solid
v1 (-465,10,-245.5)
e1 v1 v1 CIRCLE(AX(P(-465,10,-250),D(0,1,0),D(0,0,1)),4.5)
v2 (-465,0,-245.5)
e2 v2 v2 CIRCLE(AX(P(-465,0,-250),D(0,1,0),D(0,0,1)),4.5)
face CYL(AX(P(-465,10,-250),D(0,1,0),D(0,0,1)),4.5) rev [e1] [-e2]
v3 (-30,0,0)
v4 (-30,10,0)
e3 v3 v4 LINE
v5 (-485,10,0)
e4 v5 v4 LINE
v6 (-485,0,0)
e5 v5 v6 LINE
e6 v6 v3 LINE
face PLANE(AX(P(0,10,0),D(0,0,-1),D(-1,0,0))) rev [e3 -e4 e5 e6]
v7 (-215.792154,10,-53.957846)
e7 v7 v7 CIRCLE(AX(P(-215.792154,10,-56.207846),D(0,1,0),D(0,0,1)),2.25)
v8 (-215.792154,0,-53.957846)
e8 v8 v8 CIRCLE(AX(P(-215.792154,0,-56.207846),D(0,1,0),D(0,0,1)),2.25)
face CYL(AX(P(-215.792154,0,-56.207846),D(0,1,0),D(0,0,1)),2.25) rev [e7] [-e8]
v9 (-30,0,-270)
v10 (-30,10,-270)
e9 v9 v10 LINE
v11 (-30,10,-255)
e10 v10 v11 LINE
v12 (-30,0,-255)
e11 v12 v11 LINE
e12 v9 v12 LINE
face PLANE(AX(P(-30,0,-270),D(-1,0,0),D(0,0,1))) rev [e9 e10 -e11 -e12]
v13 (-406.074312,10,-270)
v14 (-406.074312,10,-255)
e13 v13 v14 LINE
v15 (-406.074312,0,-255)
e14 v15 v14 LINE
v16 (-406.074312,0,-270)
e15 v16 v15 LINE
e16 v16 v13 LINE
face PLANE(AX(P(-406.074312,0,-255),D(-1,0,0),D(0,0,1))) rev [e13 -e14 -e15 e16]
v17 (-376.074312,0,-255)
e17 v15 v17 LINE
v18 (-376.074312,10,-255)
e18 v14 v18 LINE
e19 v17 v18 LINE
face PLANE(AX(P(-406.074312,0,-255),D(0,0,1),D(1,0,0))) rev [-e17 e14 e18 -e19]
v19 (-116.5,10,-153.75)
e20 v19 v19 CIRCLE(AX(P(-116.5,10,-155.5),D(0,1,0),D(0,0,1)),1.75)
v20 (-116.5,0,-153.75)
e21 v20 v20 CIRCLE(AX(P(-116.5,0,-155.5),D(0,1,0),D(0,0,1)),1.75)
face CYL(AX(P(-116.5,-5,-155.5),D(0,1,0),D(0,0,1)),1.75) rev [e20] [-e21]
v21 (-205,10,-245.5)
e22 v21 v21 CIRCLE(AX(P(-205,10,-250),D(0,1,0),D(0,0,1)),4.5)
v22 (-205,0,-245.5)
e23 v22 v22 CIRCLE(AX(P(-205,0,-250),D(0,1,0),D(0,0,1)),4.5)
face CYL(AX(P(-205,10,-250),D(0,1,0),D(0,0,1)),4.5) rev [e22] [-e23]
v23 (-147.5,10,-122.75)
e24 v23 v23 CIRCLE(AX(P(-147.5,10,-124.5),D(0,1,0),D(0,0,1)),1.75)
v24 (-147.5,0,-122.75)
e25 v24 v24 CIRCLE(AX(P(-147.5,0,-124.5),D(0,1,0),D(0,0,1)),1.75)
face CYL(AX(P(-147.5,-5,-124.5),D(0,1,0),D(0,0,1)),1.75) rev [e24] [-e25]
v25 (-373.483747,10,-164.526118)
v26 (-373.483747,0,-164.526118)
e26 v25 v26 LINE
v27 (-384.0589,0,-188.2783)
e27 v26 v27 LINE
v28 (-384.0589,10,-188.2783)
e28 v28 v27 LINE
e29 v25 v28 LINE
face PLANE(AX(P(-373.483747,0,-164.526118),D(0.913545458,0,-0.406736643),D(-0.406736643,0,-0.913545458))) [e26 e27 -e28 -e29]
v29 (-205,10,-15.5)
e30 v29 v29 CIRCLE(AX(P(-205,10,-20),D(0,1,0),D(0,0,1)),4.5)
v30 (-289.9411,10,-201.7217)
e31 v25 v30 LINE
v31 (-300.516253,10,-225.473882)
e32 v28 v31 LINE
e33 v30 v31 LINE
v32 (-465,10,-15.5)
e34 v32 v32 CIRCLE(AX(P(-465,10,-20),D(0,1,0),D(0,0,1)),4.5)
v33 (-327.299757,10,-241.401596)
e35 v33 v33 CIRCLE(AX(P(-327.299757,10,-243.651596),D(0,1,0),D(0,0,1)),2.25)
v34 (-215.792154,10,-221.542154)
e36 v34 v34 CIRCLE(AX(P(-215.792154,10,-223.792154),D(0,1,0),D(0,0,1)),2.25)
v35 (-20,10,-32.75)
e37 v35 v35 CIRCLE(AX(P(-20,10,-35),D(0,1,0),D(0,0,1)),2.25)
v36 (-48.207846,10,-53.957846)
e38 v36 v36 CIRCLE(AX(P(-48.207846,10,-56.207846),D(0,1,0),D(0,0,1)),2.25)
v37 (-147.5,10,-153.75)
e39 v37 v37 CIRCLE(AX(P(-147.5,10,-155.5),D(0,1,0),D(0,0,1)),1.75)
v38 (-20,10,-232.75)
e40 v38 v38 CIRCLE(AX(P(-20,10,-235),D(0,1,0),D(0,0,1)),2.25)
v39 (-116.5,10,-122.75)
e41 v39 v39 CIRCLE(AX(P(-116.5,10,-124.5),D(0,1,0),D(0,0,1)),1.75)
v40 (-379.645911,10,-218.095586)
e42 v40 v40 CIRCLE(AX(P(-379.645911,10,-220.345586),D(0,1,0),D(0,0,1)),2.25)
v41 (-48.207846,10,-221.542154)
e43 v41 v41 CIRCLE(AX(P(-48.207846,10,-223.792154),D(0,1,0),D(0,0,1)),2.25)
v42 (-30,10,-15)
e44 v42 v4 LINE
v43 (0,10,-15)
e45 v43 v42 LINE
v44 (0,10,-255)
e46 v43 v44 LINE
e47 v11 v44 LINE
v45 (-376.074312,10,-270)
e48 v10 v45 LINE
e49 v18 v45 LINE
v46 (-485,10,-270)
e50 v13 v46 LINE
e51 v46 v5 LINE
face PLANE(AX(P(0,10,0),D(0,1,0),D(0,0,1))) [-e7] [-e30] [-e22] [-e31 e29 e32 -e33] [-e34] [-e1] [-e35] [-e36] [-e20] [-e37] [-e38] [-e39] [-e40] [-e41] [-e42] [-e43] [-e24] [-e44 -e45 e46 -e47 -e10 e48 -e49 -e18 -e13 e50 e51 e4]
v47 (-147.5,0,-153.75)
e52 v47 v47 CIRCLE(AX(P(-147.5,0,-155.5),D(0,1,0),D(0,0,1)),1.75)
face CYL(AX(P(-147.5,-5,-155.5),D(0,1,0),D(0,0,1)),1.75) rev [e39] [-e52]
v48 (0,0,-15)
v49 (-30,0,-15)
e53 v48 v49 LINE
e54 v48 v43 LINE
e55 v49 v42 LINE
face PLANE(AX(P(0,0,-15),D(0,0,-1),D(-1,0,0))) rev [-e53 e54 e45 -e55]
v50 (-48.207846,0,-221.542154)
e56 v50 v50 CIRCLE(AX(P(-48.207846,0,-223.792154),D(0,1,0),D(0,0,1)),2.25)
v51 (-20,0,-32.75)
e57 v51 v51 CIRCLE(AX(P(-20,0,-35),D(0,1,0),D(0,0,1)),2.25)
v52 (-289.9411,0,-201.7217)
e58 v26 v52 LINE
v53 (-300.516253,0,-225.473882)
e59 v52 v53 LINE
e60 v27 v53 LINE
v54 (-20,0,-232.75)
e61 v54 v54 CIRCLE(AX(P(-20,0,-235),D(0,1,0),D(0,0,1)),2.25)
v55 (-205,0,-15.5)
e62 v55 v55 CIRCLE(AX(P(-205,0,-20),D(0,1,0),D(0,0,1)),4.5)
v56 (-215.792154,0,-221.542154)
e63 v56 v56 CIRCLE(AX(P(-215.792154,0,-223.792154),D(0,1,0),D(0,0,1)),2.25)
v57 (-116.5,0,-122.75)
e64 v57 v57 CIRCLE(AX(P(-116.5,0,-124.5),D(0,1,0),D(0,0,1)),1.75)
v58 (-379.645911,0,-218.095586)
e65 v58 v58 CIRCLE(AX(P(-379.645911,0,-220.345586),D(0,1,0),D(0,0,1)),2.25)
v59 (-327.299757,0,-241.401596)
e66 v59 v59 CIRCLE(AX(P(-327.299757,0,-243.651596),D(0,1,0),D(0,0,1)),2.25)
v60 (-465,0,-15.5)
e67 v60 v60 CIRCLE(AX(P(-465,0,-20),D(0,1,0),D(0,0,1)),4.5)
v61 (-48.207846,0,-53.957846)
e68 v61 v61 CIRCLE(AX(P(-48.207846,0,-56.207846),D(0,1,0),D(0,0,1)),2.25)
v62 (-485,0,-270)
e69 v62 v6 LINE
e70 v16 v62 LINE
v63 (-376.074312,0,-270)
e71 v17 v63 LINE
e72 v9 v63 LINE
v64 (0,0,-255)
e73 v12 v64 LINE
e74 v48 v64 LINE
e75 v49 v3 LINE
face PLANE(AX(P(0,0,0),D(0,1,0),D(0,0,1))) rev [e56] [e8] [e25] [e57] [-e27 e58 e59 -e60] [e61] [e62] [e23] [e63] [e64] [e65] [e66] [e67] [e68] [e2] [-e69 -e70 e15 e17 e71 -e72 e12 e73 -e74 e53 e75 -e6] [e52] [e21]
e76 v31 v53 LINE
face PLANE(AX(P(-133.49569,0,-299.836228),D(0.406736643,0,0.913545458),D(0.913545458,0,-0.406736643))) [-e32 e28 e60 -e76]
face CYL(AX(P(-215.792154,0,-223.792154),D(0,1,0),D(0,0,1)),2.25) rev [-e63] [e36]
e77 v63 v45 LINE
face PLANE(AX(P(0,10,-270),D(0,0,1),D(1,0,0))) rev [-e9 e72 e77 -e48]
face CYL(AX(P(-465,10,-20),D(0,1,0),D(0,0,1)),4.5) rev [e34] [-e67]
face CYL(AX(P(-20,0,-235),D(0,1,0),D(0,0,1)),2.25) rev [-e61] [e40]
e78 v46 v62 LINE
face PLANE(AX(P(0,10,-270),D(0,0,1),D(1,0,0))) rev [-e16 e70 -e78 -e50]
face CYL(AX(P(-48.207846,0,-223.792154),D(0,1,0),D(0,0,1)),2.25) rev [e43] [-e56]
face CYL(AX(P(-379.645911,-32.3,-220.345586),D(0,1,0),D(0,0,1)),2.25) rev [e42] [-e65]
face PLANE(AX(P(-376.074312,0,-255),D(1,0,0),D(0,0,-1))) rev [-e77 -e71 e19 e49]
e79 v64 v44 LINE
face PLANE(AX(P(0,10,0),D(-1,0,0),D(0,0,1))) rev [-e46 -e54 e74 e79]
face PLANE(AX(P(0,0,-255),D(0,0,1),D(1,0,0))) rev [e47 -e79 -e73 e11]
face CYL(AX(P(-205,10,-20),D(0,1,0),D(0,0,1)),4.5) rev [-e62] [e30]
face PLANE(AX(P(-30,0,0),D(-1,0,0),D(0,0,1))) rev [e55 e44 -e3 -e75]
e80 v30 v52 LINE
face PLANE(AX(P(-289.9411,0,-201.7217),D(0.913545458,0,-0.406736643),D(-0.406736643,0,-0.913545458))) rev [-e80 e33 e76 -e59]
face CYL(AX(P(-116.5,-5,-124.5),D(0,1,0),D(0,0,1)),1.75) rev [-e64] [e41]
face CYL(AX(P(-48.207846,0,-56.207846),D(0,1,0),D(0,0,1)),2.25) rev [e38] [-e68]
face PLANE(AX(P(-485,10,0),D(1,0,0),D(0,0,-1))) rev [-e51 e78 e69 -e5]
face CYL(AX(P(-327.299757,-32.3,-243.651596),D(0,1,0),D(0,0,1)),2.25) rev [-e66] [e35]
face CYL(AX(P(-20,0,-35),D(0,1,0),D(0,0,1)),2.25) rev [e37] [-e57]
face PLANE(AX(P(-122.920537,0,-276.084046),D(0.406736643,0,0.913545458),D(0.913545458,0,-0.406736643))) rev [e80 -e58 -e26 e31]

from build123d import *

# Parameters (mm, degrees)
SCHIZZO1_W                    = 485
SCHIZZO1_H                    = 270
ESTRUSIONE_ESTRUSIONE1_DEPTH  = 10
FORO_PER_VITE_M8_1_OUTLINE_R  = 4.5
FORO_PER_VITE_M8_1_DEPTH      = 10
TAGLIO_ESTRUSIONE1_DEPTH      = 13
TAGLIO_ESTRUSIONE1_DEPTH_BACK = 13
SCHIZZO5_W                    = 91.448812178
SCHIZZO5_H                    = 10
SCHIZZO6_R                    = 2.25
TAGLIO_ESTRUSIONE2_DEPTH      = 10
SCHIZZO7_R                    = 1.75
TAGLIO_ESTRUSIONE3_DEPTH      = 15
SCHIZZO8_R                    = 2.25
TAGLIO_ESTRUSIONE4_DEPTH      = 42.3
SCHIZZO9_W                    = 30
SCHIZZO9_H                    = 15
TAGLIO_ESTRUSIONE5_DEPTH      = 10
SCHIZZO10_R                   = 2.25
TAGLIO_ESTRUSIONE6_DEPTH      = 10


# Read off the part's stored shape, not the designer's step: Foro per Vite M8-1
with BuildPart() as part:
    # Schizzo1 → Estrusione-Estrusione1 (new body)
    with BuildSketch(Plane(origin=(0, 0, 0), x_dir=(1, 0, 0), z_dir=(0, 1, 0))):
        with Locations((-242.5, 135)):
            Rectangle(SCHIZZO1_W, SCHIZZO1_H)
    extrude(amount=ESTRUSIONE_ESTRUSIONE1_DEPTH)

    # Foro per Vite M8-1 outline → Foro per Vite M8-1 (cut)
    with BuildSketch(Plane(origin=(0, 0, 0), x_dir=(1, 0, 0), z_dir=(0, 1, 0))):
        with Locations((-205, 250)):
            Circle(FORO_PER_VITE_M8_1_OUTLINE_R)
        with Locations((-465, 20)):
            Circle(FORO_PER_VITE_M8_1_OUTLINE_R)
        with Locations((-205, 20)):
            Circle(FORO_PER_VITE_M8_1_OUTLINE_R)
        with Locations((-465, 250)):
            Circle(FORO_PER_VITE_M8_1_OUTLINE_R)
    extrude(amount=FORO_PER_VITE_M8_1_DEPTH, mode=Mode.SUBTRACT)

    # Schizzo5 → Taglio-Estrusione1 (cut, two sides: drawn at the far end of the back side and taken through both)
    with BuildSketch(Plane(origin=(-128.208113313, 0, -287.960137213), x_dir=(0.9135454576425992, 0, -0.4067366430758042), z_dir=(0.4067366430758042, 0, 0.9135454576425992)).offset(-TAGLIO_ESTRUSIONE1_DEPTH_BACK)):
        with Locations((-228.551173826, 5)):
            Rectangle(SCHIZZO5_W, SCHIZZO5_H)
    extrude(amount=TAGLIO_ESTRUSIONE1_DEPTH + TAGLIO_ESTRUSIONE1_DEPTH_BACK, mode=Mode.SUBTRACT)

    # Schizzo6 → Taglio-Estrusione2 (cut)
    with BuildSketch(Plane(origin=(0, 10, 0), x_dir=(1, 0, 0), z_dir=(0, 1, 0))):
        with Locations(Location((-48.207846429, 223.792153571, 0), (0, 0, 270))):
            Circle(SCHIZZO6_R)
        with Locations(Location((-215.792153571, 223.792153571, 0), (0, 0, 270))):
            Circle(SCHIZZO6_R)
        with Locations(Location((-215.792153571, 56.207846429, 0), (0, 0, 270))):
            Circle(SCHIZZO6_R)
        with Locations(Location((-48.207846429, 56.207846429, 0), (0, 0, 270))):
            Circle(SCHIZZO6_R)
    extrude(amount=-TAGLIO_ESTRUSIONE2_DEPTH, mode=Mode.SUBTRACT)

    # Schizzo7 → Taglio-Estrusione3 (cut)
    with BuildSketch(Plane(origin=(0, 10, 0), x_dir=(1, 0, 0), z_dir=(0, 1, 0))):
        with Locations(Location((-147.5, 155.5, 0), (0, 0, 270))):
            Circle(SCHIZZO7_R)
        with Locations(Location((-116.5, 155.5, 0), (0, 0, 270))):
            Circle(SCHIZZO7_R)
        with Locations(Location((-116.5, 124.5, 0), (0, 0, 270))):
            Circle(SCHIZZO7_R)
        with Locations(Location((-147.5, 124.5, 0), (0, 0, 270))):
            Circle(SCHIZZO7_R)
    extrude(amount=-TAGLIO_ESTRUSIONE3_DEPTH, mode=Mode.SUBTRACT)

    # Schizzo8 → Taglio-Estrusione4 (cut)
    with BuildSketch(Plane(origin=(0, 10, 0), x_dir=(1, 0, 0), z_dir=(0, 1, 0))):
        with Locations(Location((-327.299756602, 243.651595895, 0), (0, 0, 270))):
            Circle(SCHIZZO8_R)
        with Locations(Location((-379.645911325, 220.345586247, 0), (0, 0, 270))):
            Circle(SCHIZZO8_R)
    extrude(amount=-TAGLIO_ESTRUSIONE4_DEPTH, mode=Mode.SUBTRACT)

    # Schizzo9 → Taglio-Estrusione5 (cut)
    with BuildSketch(Plane(origin=(0, 10, 0), x_dir=(1, 0, 0), z_dir=(0, 1, 0))):
        with Locations((-15, 262.5)):
            Rectangle(SCHIZZO9_W, SCHIZZO9_H)
        with Locations((-15, 7.5)):
            Rectangle(SCHIZZO9_W, SCHIZZO9_H)
        with Locations((-391.074312, 262.5)):
            Rectangle(SCHIZZO9_W, SCHIZZO9_H)
    extrude(amount=-TAGLIO_ESTRUSIONE5_DEPTH, mode=Mode.SUBTRACT)

    # Schizzo10 → Taglio-Estrusione6 (cut)
    with BuildSketch(Plane(origin=(0, 10, 0), x_dir=(1, 0, 0), z_dir=(0, 1, 0))):
        with Locations(Location((-20, 35, 0), (0, 0, 270))):
            Circle(SCHIZZO10_R)
        with Locations(Location((-20, 235, 0), (0, 0, 270))):
            Circle(SCHIZZO10_R)
    extrude(amount=-TAGLIO_ESTRUSIONE6_DEPTH, mode=Mode.SUBTRACT)


solid = part.part
